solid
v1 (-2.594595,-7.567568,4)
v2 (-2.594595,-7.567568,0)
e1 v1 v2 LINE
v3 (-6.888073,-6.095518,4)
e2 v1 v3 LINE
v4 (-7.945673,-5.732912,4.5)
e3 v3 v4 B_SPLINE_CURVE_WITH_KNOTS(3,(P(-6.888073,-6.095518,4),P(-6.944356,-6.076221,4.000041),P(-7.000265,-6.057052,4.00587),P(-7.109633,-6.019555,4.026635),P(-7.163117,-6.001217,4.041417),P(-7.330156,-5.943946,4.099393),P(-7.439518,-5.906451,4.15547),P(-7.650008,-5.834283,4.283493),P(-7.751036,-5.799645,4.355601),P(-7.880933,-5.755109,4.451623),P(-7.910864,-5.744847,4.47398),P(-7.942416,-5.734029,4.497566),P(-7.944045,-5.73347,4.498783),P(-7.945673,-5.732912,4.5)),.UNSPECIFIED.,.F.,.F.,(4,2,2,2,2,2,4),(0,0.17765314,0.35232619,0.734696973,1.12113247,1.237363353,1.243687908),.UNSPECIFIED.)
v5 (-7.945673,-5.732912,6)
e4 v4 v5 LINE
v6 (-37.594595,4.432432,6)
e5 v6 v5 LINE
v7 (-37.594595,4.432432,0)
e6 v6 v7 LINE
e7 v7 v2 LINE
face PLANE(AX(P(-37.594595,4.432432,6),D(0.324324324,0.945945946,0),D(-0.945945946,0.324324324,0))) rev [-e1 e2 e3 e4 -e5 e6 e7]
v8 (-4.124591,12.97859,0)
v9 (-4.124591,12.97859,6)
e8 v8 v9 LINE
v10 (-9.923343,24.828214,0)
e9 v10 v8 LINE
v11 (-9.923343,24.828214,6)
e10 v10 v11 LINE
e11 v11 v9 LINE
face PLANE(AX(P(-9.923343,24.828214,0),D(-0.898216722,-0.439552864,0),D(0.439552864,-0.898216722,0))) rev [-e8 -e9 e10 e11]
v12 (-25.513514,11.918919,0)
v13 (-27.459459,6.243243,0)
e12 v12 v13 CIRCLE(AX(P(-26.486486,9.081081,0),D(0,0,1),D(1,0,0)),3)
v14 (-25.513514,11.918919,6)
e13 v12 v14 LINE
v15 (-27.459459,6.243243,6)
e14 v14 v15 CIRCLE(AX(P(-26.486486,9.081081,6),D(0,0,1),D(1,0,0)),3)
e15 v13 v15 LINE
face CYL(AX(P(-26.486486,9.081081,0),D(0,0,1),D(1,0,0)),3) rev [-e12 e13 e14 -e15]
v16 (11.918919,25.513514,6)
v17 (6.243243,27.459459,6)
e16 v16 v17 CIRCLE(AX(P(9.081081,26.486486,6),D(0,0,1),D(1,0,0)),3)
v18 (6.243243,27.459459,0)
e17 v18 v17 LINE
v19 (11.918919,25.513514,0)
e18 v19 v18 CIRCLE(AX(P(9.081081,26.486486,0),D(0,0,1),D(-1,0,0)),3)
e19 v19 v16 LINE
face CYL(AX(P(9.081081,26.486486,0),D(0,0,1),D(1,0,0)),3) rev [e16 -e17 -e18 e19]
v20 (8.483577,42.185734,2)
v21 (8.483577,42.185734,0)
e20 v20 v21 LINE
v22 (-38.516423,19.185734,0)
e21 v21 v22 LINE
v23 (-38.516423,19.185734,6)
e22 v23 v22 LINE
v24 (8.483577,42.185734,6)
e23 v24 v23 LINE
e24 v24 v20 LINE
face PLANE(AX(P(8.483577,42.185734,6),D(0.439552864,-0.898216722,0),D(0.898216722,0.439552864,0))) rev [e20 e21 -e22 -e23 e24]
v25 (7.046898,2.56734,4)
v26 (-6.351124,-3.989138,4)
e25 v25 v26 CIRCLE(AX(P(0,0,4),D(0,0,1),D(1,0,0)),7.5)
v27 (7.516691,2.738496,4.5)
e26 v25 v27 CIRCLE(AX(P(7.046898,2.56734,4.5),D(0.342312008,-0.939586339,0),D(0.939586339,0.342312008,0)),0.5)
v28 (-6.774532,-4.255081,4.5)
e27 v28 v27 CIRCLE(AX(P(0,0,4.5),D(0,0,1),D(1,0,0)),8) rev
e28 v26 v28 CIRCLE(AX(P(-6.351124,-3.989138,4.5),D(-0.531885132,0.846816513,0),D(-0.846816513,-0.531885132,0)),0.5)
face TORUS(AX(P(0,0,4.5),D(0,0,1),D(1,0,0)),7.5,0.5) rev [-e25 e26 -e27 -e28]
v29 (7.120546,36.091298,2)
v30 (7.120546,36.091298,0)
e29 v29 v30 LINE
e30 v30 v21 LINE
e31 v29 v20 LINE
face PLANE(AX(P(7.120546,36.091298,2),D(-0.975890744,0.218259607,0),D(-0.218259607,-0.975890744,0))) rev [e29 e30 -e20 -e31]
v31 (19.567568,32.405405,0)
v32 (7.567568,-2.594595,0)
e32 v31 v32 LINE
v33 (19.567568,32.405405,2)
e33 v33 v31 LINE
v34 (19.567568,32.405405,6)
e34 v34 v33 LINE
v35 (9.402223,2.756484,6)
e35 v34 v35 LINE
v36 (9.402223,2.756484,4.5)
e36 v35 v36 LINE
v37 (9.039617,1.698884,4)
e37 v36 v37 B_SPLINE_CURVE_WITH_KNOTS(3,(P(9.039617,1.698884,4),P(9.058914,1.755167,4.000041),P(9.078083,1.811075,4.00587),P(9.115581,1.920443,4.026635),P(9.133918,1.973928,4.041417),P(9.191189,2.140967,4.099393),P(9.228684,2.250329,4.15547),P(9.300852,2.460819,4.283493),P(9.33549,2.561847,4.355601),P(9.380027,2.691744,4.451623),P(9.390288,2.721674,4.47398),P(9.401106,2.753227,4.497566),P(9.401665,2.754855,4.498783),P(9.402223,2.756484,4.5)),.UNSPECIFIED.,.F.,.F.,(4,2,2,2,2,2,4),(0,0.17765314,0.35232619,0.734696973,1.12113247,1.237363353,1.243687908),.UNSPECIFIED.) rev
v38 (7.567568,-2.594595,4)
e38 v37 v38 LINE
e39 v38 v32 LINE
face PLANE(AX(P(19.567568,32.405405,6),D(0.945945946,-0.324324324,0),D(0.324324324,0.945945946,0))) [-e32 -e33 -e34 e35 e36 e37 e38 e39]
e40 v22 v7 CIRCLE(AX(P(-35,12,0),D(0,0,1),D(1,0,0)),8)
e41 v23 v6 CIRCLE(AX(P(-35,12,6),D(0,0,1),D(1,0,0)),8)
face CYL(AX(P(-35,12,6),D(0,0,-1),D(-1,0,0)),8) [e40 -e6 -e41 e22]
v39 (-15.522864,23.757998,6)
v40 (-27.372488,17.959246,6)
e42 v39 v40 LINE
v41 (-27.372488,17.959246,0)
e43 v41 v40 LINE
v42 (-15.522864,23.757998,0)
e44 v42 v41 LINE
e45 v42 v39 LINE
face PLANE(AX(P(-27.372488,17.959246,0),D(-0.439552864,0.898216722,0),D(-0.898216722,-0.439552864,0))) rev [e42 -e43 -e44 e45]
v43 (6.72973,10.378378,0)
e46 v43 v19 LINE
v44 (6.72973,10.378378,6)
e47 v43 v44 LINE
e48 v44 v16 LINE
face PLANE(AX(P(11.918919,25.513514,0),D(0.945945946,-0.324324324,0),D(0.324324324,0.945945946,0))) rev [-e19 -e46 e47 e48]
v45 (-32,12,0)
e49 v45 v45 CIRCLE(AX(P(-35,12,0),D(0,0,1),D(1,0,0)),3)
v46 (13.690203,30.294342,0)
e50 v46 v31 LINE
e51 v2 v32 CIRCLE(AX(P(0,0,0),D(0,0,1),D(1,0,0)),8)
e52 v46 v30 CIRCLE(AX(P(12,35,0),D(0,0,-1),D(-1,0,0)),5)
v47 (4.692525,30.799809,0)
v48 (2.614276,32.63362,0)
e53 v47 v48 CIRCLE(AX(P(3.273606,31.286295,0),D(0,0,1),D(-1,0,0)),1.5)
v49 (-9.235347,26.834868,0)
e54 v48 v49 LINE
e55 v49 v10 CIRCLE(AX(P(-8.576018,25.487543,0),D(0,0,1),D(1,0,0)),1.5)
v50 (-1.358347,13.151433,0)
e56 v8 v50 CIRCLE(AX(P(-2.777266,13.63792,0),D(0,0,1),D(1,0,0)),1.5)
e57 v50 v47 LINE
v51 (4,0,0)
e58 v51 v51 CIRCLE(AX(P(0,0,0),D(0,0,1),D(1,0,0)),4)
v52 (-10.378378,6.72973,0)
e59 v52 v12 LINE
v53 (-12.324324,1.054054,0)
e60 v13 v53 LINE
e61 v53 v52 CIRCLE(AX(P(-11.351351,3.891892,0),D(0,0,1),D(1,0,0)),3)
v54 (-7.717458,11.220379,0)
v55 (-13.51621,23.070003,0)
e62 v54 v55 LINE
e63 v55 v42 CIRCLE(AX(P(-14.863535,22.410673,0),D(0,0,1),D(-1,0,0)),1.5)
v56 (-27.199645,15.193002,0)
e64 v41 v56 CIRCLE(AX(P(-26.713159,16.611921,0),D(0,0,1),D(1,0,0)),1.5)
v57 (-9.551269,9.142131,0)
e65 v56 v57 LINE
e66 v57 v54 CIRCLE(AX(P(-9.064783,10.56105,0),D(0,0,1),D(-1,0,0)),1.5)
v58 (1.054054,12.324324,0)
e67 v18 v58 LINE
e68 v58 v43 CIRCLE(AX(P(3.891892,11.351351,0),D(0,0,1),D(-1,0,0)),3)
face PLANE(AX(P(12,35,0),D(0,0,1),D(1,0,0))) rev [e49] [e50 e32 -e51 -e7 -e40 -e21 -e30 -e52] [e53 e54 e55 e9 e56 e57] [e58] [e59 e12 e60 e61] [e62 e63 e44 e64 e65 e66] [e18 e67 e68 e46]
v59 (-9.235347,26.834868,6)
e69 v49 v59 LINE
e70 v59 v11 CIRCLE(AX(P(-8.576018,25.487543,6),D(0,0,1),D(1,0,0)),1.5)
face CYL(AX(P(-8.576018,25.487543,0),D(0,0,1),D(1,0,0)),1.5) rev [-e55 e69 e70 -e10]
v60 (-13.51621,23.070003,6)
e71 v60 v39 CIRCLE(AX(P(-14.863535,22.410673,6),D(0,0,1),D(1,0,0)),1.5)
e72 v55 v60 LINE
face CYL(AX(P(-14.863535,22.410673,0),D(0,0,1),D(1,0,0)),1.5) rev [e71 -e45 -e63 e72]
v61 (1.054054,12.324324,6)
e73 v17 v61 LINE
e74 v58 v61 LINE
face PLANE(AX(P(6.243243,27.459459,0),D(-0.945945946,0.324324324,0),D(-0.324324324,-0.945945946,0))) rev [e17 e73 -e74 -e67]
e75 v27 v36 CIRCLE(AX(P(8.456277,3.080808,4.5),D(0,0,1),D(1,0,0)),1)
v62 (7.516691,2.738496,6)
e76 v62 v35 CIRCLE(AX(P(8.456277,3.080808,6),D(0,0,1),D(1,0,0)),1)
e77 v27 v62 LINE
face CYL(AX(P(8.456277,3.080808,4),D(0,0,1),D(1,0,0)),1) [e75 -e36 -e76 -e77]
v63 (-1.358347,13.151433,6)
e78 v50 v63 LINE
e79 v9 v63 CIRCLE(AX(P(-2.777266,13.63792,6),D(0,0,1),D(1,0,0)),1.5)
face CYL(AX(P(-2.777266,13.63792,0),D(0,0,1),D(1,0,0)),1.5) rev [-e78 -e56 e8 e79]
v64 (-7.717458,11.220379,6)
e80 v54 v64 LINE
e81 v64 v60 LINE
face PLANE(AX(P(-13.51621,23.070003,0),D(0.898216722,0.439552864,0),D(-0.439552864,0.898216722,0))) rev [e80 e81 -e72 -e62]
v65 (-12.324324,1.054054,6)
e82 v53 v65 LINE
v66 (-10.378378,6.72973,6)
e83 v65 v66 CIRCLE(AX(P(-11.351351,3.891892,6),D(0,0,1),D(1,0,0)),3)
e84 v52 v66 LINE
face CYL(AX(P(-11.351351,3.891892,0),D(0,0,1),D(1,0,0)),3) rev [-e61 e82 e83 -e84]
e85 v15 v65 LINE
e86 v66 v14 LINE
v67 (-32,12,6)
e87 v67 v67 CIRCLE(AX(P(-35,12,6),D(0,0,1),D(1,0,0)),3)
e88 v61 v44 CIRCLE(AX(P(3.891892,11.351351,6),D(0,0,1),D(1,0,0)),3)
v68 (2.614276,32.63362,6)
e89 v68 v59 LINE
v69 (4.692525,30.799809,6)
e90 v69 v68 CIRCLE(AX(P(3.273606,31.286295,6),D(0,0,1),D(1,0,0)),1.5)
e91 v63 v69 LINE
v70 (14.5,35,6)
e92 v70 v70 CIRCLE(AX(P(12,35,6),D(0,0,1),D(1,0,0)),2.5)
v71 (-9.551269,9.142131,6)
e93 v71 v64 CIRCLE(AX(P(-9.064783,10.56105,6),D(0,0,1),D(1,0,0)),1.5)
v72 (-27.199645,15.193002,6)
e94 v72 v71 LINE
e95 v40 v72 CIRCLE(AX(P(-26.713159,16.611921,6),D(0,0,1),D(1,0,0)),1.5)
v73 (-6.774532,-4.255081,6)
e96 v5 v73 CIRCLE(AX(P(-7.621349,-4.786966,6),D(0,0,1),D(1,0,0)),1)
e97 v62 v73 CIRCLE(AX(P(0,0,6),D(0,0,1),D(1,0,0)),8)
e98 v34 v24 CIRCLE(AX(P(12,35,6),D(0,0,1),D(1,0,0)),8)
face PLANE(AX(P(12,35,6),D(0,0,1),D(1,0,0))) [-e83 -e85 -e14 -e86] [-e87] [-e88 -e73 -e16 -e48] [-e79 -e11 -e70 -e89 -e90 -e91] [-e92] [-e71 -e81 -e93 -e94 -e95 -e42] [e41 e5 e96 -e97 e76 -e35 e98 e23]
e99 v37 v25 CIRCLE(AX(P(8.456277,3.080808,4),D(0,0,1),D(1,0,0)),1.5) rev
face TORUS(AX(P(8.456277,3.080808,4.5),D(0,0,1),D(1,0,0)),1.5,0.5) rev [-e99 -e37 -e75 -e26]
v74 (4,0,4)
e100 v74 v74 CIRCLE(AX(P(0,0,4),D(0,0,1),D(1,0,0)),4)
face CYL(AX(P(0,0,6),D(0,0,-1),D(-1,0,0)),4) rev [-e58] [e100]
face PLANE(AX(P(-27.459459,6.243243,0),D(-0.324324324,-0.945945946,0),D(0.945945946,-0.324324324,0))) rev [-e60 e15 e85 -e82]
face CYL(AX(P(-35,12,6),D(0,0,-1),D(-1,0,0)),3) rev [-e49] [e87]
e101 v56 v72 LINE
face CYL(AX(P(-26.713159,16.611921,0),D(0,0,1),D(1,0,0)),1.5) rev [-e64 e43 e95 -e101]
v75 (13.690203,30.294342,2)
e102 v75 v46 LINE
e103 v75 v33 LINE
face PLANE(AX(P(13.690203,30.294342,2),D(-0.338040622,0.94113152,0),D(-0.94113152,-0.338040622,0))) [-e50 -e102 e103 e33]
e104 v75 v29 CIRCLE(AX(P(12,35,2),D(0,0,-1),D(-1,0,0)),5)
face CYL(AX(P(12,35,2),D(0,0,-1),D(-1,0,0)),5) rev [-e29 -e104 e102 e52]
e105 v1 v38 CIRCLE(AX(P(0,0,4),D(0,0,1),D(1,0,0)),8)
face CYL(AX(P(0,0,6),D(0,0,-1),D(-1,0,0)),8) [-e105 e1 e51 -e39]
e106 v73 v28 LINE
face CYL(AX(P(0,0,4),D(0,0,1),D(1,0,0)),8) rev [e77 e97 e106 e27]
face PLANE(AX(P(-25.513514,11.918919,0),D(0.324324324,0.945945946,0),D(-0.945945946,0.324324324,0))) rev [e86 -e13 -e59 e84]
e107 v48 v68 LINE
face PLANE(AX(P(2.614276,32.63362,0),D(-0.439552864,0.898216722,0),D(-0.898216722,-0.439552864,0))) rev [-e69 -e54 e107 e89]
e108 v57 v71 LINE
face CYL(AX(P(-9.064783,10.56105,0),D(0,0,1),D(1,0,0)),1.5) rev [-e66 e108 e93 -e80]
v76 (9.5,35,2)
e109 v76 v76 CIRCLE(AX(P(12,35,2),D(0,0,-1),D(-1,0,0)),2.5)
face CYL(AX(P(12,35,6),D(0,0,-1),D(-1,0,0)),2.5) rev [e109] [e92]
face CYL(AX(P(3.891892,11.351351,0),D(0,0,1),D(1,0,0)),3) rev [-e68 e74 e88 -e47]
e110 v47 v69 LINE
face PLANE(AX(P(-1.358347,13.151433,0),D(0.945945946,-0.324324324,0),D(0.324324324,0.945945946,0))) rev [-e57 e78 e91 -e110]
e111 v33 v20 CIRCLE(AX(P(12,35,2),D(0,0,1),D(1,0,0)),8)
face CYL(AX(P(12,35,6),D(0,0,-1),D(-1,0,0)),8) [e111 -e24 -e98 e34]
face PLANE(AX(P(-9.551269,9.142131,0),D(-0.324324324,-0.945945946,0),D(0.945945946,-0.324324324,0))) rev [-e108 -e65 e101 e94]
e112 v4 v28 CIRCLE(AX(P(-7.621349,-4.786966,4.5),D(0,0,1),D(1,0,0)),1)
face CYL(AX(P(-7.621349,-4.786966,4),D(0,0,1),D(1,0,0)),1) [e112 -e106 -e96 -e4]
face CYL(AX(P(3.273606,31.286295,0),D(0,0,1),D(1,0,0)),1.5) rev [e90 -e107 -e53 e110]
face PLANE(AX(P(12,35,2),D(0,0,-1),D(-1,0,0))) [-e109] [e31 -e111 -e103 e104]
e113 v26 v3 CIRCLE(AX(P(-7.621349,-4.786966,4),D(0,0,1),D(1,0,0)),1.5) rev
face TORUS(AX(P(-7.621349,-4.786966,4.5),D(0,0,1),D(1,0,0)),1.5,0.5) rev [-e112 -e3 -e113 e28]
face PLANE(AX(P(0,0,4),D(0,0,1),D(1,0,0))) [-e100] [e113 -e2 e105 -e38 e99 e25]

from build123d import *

# Parameters (mm, degrees)
SKETCH1_R               = 3
SKETCH1_R_2             = 4
SKETCH1_R_3             = 2.5
BOSS_EXTRUDE1_DEPTH     = 6
CUT_EXTRUDE1_DEPTH      = 62.10646447
CUT_EXTRUDE1_DEPTH_BACK = 62.10646447
CUT_EXTRUDE2_START      = -2
SKETCH4_R               = 8
CUT_EXTRUDE2_DEPTH      = 2
FILLET1_START           = 4
FILLET1_DEPTH           = 2
FILLET2_R               = 0.5
CUT_EXTRUDE4_DEPTH      = 2


with BuildPart() as part:
    # Sketch1 → Boss-Extrude1 (new body)
    with BuildSketch(Plane.XY):
        with BuildLine():
            Line((19.567567568, 32.405405405), (7.567567568, -2.594594595))
            ThreePointArc((7.567567568, -2.594594595), (3.516422912, -7.185733776), (-2.594594595, -7.567567568))
            Line((-2.594594595, -7.567567568), (-37.594594595, 4.432432432))
            ThreePointArc((-37.594594595, 4.432432432), (-42.984429152, 11.50111011), (-38.516422912, 19.185733776))
            Line((-38.516422912, 19.185733776), (8.483577088, 42.185733776))
            ThreePointArc((8.483577088, 42.185733776), (17.293075573, 40.998612422), (19.567567568, 32.405405405))
        make_face()
        with Locations((-35, 12)):
            Circle(SKETCH1_R, mode=Mode.SUBTRACT)
        Circle(SKETCH1_R_2, mode=Mode.SUBTRACT)
        with Locations((12, 35)):
            Circle(SKETCH1_R_3, mode=Mode.SUBTRACT)
    extrude(amount=BOSS_EXTRUDE1_DEPTH)

    # Sketch2 → Cut-Extrude1 (cut, two sides: drawn at the far end of the back side and taken through both)
    with BuildSketch(Plane.XY.offset(6).offset(-CUT_EXTRUDE1_DEPTH_BACK)):
        with BuildLine():
            Line((-27.3724879, 17.959246424), (-15.522864255, 23.75799842))
            ThreePointArc((-15.522864255, 23.75799842), (-14.377048473, 23.829592256), (-13.516209876, 23.070002633))
            Line((-13.516209876, 23.070002633), (-7.71745788, 11.220378988))
            ThreePointArc((-7.71745788, 11.220378988), (-7.940043134, 9.568598022), (-9.551269449, 9.142130773))
            Line((-9.551269449, 9.142130773), (-27.199645091, 15.193002422))
            ThreePointArc((-27.199645091, 15.193002422), (-28.21023907, 16.518379486), (-27.3724879, 17.959246424))
        make_face()
        with BuildLine():
            Line((-25.513513514, 11.918918919), (-10.378378378, 6.72972973))
            ThreePointArc((-10.378378378, 6.72972973), (-8.513513514, 2.918918919), (-12.324324324, 1.054054054))
            Line((-12.324324324, 1.054054054), (-27.459459459, 6.243243243))
            ThreePointArc((-27.459459459, 6.243243243), (-29.324324324, 10.054054054), (-25.513513514, 11.918918919))
        make_face()
        with BuildLine():
            Line((-9.923342988, 24.828214089), (-4.124590991, 12.978590444))
            ThreePointArc((-4.124590991, 12.978590444), (-2.683724054, 12.140839274), (-1.358346989, 13.151433254))
            Line((-1.358346989, 13.151433254), (4.692524659, 30.799808895))
            ThreePointArc((4.692524659, 30.799808895), (4.26605741, 32.41103521), (2.614276444, 32.633620464))
            Line((2.614276444, 32.633620464), (-9.235347201, 26.834868468))
            ThreePointArc((-9.235347201, 26.834868468), (-9.994936824, 25.974029871), (-9.923342988, 24.828214089))
        make_face()
        with BuildLine():
            Line((6.243243243, 27.459459459), (1.054054054, 12.324324324))
            ThreePointArc((1.054054054, 12.324324324), (2.918918919, 8.513513514), (6.72972973, 10.378378378))
            Line((6.72972973, 10.378378378), (11.918918919, 25.513513514))
            ThreePointArc((11.918918919, 25.513513514), (10.054054054, 29.324324324), (6.243243243, 27.459459459))
        make_face()
    extrude(amount=CUT_EXTRUDE1_DEPTH + CUT_EXTRUDE1_DEPTH_BACK, mode=Mode.SUBTRACT)

    # Sketch4 → Cut-Extrude2 (cut)
    with BuildSketch(Plane.XY.offset(6).offset(CUT_EXTRUDE2_START)):
        Circle(SKETCH4_R)
    extrude(amount=CUT_EXTRUDE2_DEPTH, mode=Mode.SUBTRACT)

    # Fillet1: read off the stored shape, not the designer's step
    # Fillet1 outline → Fillet1 (cut)
    with BuildSketch(Plane.XY.offset(FILLET1_START)):
        with BuildLine():
            ThreePointArc((9.402223, 2.75648375), (8.465816464, 2.080853575), (7.516690715, 2.738496066))
            ThreePointArc((7.516690715, 2.738496066), (7.999635991, 0.076315279), (7.567567568, -2.594594595))
            Line((7.567567568, -2.594594595), (9.402223, 2.75648375))
        make_face()
        with BuildLine():
            ThreePointArc((-2.594594595, -7.567567568), (-4.968729766, -6.269906261), (-6.774532102, -4.255081057))
            ThreePointArc((-6.774532102, -4.255081057), (-6.837610332, -5.40805741), (-7.945672939, -5.732912135))
            Line((-7.945672939, -5.732912135), (-2.594594595, -7.567567568))
        make_face()
    extrude(amount=FILLET1_DEPTH, mode=Mode.SUBTRACT)

    # Fillet2
    fillet2_edges = [part.edges().sort_by_distance(p)[0] for p in [
        (-3.516422912, 7.185733776, 4),
        (8.465816464, 2.080853575, 4),
        (-6.837610332, -5.40805741, 4),
    ]]
    fillet(fillet2_edges, radius=FILLET2_R)

    # Sketch5 → Cut-Extrude4 (cut)
    with BuildSketch(Plane(origin=(0, 0, 0), x_dir=(-1, 0, 0), z_dir=(0, 0, -1))):
        with BuildLine():
            Line((-7.12054628, 36.091298034), (-8.483577088, 42.185733776))
            ThreePointArc((-8.483577088, 42.185733776), (-17.293075573, 40.998612422), (-19.567567568, 32.405405405))
            Line((-19.567567568, 32.405405405), (-13.690203108, 30.2943424))
            ThreePointArc((-13.690203108, 30.2943424), (-8.691827767, 31.250867237), (-7.12054628, 36.091298034))
        make_face()
    extrude(amount=-CUT_EXTRUDE4_DEPTH, mode=Mode.SUBTRACT)


solid = part.part
